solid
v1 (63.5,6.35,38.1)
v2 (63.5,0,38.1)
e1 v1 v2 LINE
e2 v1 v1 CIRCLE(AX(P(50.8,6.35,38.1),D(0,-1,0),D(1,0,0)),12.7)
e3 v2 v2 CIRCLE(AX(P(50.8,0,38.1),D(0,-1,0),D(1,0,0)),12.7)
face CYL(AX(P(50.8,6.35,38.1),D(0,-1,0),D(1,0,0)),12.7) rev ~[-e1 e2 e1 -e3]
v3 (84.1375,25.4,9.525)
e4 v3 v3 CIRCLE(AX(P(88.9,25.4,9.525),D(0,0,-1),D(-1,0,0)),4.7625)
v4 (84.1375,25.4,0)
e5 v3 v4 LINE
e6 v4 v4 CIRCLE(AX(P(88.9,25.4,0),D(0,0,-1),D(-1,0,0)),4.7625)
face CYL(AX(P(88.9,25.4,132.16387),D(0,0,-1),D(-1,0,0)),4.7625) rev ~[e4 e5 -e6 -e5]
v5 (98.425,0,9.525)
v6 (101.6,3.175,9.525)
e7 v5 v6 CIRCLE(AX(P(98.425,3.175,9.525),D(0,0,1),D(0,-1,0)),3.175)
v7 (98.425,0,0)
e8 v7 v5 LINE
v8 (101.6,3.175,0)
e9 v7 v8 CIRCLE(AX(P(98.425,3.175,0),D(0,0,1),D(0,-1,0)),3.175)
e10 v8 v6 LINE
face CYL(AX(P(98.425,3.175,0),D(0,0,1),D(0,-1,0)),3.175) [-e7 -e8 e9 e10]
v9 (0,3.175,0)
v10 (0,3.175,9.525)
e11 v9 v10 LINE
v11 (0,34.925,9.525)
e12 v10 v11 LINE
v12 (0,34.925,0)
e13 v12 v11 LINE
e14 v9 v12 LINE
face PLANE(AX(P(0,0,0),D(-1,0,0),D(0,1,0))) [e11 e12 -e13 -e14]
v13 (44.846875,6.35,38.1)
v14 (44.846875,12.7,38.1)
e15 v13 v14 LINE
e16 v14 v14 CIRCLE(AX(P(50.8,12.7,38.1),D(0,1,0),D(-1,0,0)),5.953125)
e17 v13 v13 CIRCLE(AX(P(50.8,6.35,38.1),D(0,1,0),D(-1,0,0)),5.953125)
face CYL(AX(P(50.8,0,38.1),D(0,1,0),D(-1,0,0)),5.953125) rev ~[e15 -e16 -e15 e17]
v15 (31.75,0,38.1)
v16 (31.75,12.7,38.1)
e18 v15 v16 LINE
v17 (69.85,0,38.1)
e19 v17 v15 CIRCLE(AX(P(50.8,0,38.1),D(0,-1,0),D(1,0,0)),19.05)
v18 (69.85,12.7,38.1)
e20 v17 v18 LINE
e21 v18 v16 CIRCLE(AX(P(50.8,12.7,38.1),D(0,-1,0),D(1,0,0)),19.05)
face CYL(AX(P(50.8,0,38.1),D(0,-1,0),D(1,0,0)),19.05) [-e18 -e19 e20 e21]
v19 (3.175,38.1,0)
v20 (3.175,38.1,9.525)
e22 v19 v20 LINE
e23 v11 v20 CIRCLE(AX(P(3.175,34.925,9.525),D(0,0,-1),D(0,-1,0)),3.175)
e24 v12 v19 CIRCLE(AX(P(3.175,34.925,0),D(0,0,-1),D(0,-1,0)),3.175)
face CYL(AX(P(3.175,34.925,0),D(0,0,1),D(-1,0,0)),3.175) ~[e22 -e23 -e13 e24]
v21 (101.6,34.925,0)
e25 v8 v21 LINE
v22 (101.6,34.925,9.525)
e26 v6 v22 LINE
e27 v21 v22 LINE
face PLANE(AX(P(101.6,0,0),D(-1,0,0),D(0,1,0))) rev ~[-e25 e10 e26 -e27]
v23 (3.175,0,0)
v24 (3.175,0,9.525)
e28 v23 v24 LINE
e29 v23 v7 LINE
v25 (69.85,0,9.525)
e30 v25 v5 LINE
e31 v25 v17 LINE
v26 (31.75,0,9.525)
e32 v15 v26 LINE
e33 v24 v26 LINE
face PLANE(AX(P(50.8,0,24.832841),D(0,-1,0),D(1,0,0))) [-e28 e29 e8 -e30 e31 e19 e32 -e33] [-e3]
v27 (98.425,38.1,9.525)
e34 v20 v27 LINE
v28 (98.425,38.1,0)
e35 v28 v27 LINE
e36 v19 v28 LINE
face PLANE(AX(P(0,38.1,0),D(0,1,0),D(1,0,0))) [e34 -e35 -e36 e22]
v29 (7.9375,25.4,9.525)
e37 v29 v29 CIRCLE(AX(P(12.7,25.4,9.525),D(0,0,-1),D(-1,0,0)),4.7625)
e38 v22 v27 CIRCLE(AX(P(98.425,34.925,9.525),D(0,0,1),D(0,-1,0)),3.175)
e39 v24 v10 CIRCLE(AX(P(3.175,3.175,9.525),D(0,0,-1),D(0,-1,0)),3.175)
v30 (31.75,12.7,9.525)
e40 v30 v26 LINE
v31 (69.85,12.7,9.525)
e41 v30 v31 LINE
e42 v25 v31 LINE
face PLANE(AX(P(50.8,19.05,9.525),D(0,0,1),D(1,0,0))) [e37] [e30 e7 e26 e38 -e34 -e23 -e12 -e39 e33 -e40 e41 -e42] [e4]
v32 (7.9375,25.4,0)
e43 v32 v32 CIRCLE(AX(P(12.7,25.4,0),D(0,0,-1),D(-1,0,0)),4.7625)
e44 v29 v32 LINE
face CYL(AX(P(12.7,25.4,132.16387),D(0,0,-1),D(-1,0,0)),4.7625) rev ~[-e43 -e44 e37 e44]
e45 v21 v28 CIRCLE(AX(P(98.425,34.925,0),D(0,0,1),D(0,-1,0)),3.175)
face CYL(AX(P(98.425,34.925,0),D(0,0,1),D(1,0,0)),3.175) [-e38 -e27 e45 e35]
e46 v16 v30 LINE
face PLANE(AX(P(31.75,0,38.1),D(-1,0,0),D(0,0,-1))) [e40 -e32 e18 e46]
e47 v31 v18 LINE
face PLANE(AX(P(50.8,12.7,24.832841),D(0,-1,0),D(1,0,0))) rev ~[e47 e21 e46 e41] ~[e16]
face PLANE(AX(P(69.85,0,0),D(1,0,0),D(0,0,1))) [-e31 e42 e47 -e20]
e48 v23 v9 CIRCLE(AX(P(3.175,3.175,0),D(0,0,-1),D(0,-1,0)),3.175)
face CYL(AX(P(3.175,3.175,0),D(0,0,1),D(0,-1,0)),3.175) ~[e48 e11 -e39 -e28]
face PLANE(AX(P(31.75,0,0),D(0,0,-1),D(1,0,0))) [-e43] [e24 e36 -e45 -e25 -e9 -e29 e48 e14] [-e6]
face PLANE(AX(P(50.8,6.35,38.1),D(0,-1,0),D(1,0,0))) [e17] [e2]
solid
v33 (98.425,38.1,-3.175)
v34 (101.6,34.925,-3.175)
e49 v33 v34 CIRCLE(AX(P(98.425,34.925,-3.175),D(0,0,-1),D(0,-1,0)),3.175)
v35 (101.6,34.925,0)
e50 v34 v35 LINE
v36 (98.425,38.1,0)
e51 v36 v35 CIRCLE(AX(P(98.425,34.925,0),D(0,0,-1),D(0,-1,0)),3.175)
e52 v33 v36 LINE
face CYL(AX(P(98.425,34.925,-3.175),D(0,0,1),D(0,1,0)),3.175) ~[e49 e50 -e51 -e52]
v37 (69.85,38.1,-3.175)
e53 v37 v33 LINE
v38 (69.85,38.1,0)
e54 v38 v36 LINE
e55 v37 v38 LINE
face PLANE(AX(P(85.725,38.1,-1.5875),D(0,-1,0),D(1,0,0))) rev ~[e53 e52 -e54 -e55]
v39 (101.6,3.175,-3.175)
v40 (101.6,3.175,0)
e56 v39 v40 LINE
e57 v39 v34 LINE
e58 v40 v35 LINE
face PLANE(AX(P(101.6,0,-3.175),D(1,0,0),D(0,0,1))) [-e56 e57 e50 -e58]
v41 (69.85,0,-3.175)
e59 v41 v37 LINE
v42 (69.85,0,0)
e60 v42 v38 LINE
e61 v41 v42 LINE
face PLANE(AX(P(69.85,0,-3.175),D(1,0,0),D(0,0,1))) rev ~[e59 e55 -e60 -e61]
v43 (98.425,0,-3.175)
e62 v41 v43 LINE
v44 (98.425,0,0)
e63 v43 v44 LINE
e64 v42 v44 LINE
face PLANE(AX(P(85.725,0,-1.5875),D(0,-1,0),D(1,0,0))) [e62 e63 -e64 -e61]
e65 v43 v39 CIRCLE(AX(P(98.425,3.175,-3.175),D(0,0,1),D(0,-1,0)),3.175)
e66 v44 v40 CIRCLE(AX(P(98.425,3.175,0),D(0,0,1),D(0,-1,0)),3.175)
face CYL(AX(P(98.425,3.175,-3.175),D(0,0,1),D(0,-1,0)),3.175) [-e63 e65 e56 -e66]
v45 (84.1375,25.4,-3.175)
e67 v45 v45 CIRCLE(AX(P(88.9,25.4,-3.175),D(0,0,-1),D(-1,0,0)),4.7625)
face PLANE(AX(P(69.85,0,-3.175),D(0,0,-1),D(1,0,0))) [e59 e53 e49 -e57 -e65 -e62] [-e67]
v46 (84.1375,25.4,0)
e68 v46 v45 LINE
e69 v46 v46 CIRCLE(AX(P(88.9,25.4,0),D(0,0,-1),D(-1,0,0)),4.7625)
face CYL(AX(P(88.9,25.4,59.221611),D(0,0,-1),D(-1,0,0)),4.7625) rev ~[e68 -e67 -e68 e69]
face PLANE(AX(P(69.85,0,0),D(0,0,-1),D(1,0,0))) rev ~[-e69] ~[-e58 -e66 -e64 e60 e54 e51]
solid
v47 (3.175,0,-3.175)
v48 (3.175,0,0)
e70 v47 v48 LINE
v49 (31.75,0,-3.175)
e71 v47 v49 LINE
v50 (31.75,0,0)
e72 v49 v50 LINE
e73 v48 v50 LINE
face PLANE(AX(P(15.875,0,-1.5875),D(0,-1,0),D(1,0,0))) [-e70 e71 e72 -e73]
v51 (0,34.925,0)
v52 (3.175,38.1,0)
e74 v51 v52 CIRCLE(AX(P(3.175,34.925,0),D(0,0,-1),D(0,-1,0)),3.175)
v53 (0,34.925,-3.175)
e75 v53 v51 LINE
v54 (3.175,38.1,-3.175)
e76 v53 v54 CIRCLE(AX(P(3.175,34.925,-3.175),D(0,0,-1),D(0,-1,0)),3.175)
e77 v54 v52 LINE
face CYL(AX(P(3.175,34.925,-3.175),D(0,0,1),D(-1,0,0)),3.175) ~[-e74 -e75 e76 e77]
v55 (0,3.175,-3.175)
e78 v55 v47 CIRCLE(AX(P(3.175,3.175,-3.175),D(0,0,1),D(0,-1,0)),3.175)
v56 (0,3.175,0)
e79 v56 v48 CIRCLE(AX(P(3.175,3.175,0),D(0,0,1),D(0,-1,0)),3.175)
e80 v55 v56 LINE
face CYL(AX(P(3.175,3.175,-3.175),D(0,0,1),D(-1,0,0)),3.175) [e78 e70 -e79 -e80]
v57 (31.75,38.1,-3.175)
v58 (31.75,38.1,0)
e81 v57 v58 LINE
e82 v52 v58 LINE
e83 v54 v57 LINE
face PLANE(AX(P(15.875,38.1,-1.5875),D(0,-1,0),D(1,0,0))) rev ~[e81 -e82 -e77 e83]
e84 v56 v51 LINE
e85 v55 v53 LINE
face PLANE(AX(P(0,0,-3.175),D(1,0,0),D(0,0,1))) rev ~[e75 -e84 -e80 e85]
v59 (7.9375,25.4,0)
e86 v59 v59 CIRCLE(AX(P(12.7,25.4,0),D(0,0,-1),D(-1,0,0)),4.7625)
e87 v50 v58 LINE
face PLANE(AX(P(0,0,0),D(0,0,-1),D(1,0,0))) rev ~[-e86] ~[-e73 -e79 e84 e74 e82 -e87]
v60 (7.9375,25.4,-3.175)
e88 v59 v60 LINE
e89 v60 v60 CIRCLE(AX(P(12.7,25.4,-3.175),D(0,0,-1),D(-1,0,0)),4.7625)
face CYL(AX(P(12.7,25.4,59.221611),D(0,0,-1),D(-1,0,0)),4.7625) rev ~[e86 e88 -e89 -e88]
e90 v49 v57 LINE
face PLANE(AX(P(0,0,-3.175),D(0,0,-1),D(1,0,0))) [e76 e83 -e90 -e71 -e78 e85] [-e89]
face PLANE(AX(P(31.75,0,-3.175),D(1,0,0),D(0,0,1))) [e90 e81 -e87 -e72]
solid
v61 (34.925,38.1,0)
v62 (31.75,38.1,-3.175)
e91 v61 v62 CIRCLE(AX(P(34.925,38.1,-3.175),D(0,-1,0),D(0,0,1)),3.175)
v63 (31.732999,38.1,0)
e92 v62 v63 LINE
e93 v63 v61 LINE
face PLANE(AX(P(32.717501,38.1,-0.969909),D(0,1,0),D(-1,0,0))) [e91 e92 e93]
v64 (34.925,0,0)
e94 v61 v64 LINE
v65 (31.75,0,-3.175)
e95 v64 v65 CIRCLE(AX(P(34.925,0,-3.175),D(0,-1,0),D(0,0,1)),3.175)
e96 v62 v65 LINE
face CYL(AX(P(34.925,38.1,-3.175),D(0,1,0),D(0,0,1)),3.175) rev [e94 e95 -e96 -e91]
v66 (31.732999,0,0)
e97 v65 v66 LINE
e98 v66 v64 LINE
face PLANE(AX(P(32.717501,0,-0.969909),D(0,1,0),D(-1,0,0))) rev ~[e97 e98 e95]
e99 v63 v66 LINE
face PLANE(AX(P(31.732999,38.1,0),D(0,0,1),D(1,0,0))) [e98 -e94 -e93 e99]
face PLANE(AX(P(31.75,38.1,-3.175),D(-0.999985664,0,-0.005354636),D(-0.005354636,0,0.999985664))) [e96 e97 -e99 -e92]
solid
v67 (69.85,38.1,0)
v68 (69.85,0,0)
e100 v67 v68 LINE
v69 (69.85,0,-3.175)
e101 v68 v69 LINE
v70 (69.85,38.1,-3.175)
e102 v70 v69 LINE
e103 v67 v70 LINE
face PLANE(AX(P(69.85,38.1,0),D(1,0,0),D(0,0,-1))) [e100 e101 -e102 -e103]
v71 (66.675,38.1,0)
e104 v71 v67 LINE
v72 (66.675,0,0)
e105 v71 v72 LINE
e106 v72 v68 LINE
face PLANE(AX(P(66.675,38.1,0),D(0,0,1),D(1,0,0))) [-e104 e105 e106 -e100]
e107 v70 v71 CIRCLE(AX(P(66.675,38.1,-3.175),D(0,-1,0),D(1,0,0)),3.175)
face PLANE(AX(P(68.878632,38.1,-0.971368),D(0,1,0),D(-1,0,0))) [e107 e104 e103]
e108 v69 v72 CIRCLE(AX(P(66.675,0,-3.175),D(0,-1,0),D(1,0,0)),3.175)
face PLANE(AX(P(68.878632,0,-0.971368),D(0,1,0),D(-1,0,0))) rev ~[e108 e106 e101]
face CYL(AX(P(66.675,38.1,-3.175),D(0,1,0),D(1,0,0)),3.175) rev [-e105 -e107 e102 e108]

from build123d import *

# Parameters (mm, degrees)
F0_W           = 101.6
F0_H           = 38.1
F1_DEPTH       = 9.525
F3_DEPTH       = 12.7
F5_D           = 11.90625
F5_CBORE_D     = 25.4
F5_CBORE_DEPTH = 6.35
F7_W           = 31.75
F7_H           = 3.175
F8_DEPTH       = 38.1
F10_D          = 9.525
F10_2_D        = 9.525
F10_3_D        = 9.525
F11_R          = 3.175
F11_2_R        = 3.175
F11_3_R        = 3.175
F13_DEPTH      = 38.1


# Not quite as in the source:
# - a length typed as a fraction of an inch, garbled in the dataset ("3 / 203.2 mm" for 3/8 in), is restored


with BuildPart() as f1:
    # F0 (on Top) → F1 (new body)
    with BuildSketch(Plane.XY):
        with Locations((50.8, 19.05)):
            Rectangle(F0_W, F0_H)
    extrude(amount=F1_DEPTH)

    # F2 (on face) → F3 (join)
    with BuildSketch(Plane.XZ):
        with BuildLine():
            Line((31.75, 38.1), (31.75, 0))
            Line((31.75, 0), (69.85, 0))
            Line((69.85, 0), (69.85, 38.1))
            ThreePointArc((69.85, 38.1), (50.8, 57.15), (31.75, 38.1))
        make_face()
    extrude(amount=-F3_DEPTH)

    # F5 (through all)
    with Locations(Plane.XZ):
        with Locations((50.8, 38.1)):
            CounterBoreHole(F5_D / 2, F5_CBORE_D / 2, F5_CBORE_DEPTH)

    # F10 (through all)
    with Locations(Plane.XY.offset(9.525)):
        with Locations((12.7, 25.4), (88.9, 25.4)):
            Hole(F10_D / 2)

    # F11
    f11_edges = [f1.edges().sort_by_distance(p)[0] for p in [
        (0, 0, 4.7625),
        (0, 38.1, 4.7625),
        (101.6, 0, 4.7625),
        (101.6, 38.1, 4.7625),
    ]]
    fillet(f11_edges, radius=F11_R)


with BuildPart() as f8:
    # F7 (on face) → F8 (new body, through all)
    with BuildSketch(Plane.XZ):
        with Locations((15.875, -1.5875)):
            Rectangle(F7_W, F7_H)
    extrude(amount=-F8_DEPTH)

    # F10#2 (through all)
    with Locations(Plane.XY.offset(9.525)):
        with Locations((12.7, 25.4), (88.9, 25.4)):
            Hole(F10_2_D / 2)

    # F11#2
    f11_2_edges = [f8.edges().sort_by_distance(p)[0] for p in [
        (0, 0, -1.5875),
        (0, 38.1, -1.5875),
    ]]
    fillet(f11_2_edges, radius=F11_2_R)


with BuildPart() as f8b:
    # F7 (on face) → F8, piece 2 (new body, through all)
    with BuildSketch(Plane.XZ):
        with Locations((85.725, -1.5875)):
            Rectangle(F7_W, F7_H)
    extrude(amount=-F8_DEPTH)

    # F10#3 (through all)
    with Locations(Plane.XY.offset(9.525)):
        with Locations((12.7, 25.4), (88.9, 25.4)):
            Hole(F10_3_D / 2)

    # F11#3
    f11_3_edges = [f8b.edges().sort_by_distance(p)[0] for p in [
        (101.6, 0, -1.5875),
        (101.6, 38.1, -1.5875),
    ]]
    fillet(f11_3_edges, radius=F11_3_R)


with BuildPart() as f13:
    # F12 (on face) → F13 (new body, through all)
    with BuildSketch(Plane(origin=(0, 38.1, 0), x_dir=(-1, 0, 0), z_dir=(0, 1, 0))):
        with BuildLine():
            Line((-31.7329987884, 0), (-34.925, 0))
            ThreePointArc((-34.925, 0), (-32.6799359697, -0.9299359697), (-31.75, -3.175))
            Line((-31.75, -3.175), (-31.7329987884, 0))
        make_face()
    extrude(amount=-F13_DEPTH)


with BuildPart() as f13b:
    # F12 (on face) → F13, piece 2 (new body, through all)
    with BuildSketch(Plane(origin=(0, 38.1, 0), x_dir=(-1, 0, 0), z_dir=(0, 1, 0))):
        with BuildLine():
            Line((-69.85, 0), (-69.85, -3.175))
            ThreePointArc((-69.85, -3.175), (-68.9200640303, -0.9299359697), (-66.675, 0))
            Line((-66.675, 0), (-69.85, 0))
        make_face()
    extrude(amount=-F13_DEPTH)


solid = Compound([f1.part, f8.part, f8b.part, f13.part, f13b.part])
